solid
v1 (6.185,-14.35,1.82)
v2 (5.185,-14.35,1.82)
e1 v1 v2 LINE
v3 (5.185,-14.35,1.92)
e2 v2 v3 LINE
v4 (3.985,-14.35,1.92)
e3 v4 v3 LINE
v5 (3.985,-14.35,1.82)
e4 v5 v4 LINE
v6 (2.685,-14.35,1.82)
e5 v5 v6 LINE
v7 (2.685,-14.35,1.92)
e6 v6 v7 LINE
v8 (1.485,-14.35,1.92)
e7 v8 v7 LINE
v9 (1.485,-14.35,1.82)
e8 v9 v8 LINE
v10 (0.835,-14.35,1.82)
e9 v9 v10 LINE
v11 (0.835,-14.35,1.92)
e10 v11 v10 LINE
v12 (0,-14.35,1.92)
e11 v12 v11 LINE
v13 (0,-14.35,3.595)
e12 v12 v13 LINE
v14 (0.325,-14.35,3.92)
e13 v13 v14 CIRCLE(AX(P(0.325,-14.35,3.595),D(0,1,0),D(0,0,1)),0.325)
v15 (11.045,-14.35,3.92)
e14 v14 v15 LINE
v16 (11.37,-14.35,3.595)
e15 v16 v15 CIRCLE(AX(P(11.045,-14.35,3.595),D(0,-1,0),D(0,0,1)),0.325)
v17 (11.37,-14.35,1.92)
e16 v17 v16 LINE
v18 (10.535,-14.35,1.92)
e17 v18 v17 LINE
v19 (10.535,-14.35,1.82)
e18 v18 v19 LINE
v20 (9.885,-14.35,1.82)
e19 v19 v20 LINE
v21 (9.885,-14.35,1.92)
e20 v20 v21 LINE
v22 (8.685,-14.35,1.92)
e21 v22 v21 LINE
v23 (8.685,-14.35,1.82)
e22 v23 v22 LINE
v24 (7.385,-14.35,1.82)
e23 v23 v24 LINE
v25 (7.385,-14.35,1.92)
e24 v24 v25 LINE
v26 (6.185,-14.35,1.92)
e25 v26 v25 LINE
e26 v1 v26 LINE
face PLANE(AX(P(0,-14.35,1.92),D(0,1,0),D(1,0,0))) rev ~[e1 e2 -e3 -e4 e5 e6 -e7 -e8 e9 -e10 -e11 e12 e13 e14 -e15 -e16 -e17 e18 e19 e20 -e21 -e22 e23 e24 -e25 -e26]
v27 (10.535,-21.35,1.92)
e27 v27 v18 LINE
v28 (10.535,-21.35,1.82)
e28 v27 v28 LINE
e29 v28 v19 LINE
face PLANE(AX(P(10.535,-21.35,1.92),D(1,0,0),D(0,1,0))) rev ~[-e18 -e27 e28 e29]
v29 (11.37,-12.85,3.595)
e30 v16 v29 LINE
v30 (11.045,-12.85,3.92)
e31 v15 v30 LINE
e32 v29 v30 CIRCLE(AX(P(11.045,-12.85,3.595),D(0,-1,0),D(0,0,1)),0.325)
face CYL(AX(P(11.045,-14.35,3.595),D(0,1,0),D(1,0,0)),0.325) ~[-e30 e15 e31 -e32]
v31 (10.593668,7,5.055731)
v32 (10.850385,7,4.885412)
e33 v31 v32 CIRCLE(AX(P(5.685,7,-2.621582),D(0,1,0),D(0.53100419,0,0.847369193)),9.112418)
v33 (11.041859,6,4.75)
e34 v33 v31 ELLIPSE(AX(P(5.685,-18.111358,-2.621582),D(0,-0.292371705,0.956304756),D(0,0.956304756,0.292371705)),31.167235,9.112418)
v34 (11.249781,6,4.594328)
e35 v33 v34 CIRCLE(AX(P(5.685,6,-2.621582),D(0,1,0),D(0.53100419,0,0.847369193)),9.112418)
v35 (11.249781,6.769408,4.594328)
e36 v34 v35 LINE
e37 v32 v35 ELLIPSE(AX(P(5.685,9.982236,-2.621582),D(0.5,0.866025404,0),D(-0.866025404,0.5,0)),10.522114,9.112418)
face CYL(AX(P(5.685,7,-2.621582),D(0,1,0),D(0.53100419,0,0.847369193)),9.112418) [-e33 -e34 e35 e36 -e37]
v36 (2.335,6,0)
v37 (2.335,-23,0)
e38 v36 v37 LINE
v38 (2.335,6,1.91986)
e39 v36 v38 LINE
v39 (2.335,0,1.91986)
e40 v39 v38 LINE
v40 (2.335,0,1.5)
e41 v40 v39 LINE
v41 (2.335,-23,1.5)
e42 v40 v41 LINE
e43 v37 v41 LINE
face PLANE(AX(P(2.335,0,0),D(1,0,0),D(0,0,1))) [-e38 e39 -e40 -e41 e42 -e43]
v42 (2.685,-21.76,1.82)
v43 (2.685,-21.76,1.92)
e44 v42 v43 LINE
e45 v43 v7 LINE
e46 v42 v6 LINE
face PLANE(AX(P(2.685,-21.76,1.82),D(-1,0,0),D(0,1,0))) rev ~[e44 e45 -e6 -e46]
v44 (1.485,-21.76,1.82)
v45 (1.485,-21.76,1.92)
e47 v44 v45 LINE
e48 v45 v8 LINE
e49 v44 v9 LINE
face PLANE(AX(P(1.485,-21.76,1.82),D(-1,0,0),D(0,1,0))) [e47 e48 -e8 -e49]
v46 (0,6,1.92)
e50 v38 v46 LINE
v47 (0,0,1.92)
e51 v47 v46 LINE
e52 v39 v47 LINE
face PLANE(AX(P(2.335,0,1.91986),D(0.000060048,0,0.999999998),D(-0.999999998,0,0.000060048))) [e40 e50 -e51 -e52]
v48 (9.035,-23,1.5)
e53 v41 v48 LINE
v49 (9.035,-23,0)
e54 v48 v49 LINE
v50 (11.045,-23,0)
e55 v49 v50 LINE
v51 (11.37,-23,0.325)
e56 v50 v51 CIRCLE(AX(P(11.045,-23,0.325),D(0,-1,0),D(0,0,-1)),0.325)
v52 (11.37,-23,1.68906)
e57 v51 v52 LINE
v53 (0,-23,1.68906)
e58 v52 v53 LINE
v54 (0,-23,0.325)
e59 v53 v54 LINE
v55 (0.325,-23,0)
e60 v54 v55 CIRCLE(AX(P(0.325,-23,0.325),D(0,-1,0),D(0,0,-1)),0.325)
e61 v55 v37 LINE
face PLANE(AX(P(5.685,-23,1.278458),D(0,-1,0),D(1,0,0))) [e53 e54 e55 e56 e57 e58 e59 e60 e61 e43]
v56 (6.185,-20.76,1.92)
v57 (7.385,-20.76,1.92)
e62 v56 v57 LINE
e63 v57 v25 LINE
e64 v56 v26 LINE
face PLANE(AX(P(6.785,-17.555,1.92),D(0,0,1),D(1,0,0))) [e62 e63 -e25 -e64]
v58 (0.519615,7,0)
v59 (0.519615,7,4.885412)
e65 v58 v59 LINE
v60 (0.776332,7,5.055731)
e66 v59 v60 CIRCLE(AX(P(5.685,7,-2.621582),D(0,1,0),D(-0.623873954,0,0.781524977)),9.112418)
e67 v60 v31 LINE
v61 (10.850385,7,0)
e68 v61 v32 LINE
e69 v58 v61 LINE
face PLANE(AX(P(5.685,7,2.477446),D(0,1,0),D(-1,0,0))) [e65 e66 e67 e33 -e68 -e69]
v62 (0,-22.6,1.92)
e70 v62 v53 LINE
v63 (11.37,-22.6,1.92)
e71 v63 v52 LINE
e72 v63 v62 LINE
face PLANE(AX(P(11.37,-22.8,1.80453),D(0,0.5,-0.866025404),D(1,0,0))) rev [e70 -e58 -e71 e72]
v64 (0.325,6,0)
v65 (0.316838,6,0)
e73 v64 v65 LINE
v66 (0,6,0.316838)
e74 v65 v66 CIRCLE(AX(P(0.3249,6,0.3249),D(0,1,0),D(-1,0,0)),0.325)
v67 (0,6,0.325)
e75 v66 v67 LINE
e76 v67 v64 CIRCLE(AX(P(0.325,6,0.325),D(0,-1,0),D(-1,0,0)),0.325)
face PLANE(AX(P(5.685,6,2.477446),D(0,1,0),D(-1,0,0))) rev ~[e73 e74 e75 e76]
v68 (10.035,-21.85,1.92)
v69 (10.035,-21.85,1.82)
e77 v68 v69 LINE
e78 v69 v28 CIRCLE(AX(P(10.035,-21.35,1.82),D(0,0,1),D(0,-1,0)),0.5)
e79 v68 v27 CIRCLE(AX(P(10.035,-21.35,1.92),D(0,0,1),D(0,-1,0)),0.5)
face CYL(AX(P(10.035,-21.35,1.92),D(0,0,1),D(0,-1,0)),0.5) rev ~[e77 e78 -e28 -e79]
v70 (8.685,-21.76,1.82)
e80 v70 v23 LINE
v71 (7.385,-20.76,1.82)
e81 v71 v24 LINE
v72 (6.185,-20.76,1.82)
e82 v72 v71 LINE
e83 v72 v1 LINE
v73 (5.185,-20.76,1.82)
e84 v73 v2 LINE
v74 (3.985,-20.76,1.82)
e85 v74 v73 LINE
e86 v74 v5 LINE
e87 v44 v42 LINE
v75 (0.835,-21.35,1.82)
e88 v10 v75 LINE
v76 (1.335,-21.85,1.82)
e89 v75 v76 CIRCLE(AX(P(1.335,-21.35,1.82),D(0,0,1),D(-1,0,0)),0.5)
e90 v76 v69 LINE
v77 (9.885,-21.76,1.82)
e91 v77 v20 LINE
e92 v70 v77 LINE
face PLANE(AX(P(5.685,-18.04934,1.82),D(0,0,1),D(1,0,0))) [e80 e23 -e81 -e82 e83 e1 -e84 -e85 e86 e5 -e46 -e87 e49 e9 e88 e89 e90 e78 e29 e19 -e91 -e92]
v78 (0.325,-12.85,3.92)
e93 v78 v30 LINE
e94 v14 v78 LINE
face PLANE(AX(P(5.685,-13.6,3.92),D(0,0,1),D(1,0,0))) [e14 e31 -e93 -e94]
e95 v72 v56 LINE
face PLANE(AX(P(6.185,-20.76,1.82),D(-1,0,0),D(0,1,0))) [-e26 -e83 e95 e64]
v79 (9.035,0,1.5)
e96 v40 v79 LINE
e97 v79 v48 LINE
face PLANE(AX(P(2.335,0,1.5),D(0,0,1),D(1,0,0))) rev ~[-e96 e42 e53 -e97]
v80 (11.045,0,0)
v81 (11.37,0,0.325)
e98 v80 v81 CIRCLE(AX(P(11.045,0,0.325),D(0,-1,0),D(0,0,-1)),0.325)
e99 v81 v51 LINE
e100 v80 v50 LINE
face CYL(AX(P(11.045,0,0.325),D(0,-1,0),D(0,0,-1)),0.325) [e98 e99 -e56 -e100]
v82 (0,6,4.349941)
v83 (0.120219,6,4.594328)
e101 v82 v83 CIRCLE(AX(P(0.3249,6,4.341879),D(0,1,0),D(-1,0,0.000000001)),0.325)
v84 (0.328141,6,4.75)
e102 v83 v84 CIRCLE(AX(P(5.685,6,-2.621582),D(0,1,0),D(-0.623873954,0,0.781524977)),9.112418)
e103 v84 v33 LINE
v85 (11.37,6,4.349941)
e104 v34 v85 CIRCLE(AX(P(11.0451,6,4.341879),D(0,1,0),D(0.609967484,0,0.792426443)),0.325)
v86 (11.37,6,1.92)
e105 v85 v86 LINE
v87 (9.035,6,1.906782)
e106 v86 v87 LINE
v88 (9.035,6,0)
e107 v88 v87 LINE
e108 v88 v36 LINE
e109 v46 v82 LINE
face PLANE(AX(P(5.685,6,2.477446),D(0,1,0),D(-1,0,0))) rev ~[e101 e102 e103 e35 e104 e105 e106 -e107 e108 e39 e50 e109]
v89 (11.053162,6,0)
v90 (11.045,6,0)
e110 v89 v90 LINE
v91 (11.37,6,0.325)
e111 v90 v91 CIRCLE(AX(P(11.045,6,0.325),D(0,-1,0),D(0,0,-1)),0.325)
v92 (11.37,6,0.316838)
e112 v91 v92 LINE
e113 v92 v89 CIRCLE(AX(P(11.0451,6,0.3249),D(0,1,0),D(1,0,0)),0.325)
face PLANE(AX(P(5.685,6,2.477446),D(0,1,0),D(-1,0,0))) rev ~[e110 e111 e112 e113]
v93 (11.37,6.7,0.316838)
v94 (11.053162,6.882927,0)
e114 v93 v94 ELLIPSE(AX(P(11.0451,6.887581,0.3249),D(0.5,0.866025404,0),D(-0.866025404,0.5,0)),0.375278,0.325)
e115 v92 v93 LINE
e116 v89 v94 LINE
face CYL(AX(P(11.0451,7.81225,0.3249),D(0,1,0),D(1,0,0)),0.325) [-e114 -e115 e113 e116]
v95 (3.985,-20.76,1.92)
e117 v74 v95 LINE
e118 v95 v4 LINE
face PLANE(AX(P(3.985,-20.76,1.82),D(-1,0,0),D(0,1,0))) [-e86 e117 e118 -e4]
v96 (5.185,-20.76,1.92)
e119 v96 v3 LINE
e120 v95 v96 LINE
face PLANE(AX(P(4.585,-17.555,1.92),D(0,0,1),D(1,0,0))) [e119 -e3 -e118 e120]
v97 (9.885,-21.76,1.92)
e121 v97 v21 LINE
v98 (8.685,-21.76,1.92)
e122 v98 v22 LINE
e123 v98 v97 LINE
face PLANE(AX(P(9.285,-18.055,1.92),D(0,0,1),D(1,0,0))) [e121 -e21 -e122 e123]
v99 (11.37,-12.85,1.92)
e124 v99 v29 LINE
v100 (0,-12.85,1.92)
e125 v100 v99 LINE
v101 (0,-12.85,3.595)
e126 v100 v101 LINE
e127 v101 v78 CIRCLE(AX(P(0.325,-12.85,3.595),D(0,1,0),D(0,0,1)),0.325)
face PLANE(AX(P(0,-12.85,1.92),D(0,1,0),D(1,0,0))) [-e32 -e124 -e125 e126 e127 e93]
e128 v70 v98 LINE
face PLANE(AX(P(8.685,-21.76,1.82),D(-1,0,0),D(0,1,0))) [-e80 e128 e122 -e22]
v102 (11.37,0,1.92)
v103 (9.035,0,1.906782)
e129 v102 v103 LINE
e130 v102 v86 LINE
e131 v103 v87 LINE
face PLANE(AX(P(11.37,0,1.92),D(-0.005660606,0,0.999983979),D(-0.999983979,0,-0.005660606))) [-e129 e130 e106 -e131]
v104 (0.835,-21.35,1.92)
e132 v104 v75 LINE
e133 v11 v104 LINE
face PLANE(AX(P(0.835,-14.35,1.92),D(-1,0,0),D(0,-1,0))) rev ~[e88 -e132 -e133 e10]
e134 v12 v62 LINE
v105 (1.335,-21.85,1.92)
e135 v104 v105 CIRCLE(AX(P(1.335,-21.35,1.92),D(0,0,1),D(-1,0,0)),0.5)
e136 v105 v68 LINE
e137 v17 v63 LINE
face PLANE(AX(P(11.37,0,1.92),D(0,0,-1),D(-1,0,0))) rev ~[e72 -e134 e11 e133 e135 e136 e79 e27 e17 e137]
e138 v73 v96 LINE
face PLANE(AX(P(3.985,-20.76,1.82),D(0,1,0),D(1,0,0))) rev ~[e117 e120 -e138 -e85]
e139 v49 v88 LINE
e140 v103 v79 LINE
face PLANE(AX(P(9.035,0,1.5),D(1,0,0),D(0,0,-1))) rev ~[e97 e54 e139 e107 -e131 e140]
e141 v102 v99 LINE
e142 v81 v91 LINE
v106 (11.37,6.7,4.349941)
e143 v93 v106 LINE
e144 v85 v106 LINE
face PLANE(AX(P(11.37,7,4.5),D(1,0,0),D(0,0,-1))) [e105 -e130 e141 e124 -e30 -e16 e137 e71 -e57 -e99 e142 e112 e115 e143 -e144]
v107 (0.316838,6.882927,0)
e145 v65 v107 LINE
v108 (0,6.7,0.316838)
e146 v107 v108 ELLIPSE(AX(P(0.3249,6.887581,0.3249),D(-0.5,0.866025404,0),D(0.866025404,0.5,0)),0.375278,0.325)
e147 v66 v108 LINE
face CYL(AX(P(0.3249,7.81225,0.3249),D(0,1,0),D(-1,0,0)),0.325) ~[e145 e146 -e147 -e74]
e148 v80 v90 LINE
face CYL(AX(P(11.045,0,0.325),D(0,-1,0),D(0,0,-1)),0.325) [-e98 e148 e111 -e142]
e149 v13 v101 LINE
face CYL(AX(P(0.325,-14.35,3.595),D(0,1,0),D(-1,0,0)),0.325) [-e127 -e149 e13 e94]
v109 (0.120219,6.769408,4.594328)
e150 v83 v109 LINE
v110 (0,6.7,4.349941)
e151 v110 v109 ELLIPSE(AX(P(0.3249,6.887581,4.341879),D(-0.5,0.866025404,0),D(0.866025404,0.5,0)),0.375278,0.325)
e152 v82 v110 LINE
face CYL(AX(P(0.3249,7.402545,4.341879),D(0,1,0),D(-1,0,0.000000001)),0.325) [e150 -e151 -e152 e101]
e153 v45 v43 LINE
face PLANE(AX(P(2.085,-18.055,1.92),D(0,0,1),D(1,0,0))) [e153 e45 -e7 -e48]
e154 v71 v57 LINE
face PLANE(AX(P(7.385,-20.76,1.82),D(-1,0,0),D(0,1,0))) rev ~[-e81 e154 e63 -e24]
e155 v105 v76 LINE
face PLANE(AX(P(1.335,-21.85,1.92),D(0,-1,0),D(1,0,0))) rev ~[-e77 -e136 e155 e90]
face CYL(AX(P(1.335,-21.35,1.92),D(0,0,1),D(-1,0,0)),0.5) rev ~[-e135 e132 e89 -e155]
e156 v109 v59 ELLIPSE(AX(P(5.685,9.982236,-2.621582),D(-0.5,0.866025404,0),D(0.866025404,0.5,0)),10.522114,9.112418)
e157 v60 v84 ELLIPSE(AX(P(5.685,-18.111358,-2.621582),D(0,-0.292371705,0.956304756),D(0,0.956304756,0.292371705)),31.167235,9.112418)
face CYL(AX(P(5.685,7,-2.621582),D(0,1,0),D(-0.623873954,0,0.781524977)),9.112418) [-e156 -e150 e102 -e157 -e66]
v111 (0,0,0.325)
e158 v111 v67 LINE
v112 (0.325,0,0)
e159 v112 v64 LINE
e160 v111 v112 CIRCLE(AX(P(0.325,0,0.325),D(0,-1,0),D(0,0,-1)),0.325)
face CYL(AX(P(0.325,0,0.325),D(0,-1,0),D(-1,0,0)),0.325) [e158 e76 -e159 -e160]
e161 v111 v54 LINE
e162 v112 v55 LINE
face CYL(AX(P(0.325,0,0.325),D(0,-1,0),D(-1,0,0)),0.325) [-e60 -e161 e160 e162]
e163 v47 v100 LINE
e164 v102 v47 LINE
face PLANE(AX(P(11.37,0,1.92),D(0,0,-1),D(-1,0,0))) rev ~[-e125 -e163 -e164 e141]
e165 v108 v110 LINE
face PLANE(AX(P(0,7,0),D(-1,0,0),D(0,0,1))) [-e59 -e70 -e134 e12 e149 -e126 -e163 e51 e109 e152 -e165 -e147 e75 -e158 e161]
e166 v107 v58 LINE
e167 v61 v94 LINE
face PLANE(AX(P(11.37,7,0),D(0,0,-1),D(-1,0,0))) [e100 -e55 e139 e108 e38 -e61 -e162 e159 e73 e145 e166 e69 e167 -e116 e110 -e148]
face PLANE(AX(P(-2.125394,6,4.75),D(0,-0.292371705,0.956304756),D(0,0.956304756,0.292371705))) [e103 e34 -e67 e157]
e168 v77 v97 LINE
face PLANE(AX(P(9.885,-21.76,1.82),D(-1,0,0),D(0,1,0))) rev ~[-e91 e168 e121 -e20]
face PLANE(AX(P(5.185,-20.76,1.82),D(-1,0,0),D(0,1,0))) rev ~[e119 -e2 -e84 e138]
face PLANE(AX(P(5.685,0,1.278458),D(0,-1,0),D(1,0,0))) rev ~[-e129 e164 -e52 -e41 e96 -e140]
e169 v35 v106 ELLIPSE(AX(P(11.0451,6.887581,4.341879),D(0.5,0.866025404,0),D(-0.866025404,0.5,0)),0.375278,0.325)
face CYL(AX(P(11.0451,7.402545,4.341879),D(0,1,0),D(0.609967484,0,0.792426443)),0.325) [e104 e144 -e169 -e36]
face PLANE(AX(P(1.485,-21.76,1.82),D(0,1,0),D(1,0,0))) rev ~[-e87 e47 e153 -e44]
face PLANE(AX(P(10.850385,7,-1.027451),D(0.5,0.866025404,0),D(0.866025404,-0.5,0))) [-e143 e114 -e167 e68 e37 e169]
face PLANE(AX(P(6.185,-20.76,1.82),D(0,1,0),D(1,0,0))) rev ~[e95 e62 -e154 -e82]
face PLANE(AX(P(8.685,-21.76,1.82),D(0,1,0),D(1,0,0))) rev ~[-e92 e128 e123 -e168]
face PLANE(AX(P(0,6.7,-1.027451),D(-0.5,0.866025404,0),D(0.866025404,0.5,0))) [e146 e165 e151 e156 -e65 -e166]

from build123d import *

# Parameters (mm, degrees)
F1_DEPTH     = 23
F2_R         = 0.325
F3_SIZE2     = 0.2309401077
F3_SIZE      = 0.4
F5_DEPTH     = 7
F7_DEPTH     = 1
F8_T1_DEPTH  = 2.6245000769
F8_T3_DEPTH  = 1.8050905296
F9_W         = 11.37
F9_H         = 1.5
F10_DEPTH    = 2
F11_R        = 0.325
F12_T1_DEPTH = 6.7216810245
F14_DEPTH    = 0.1
F15_W        = 1.2
F15_H        = 6.41
F15_H_2      = 7.41
F16_DEPTH    = 0.1
F17_T1_DEPTH = 15.6207881718


# Not quite as in the source:
# - a fillet or chamfer that OpenCascade refuses, or shapes differently, is made with other operations: its cross-section is extruded or revolved along the edge and cut away or added


with BuildPart() as f1:
    # F0 (on Front) → F1 (new body)
    with BuildSketch(Plane.XZ):
        Polygon((0, 1.92), (0, 0), (2.335, 0), (2.335, 1.5), (9.035, 1.5), (9.035, 0), (11.37, 0), (11.37, 1.92), align=None)
    extrude(amount=F1_DEPTH)

    # F2
    f2_edges = [f1.edges().sort_by_distance(p)[0] for p in [
        (11.37, -11.5, 0),
        (0, -11.5, 0),
    ]]
    fillet(f2_edges, radius=F2_R)

    # F3
    f3_edges = [f1.edges().sort_by_distance(p)[0] for p in [
        (5.685, -23, 1.92),
    ]]
    f3_side = f1.faces().sort_by_distance((5.685, -11.5, 1.92))[0]
    chamfer(f3_edges, length=F3_SIZE, length2=F3_SIZE2, reference=f3_side)

    # F4 (on Front) → F5 (join)
    with BuildSketch(Plane.XZ):
        with BuildLine():
            ThreePointArc((0, 0.325), (0.0951902961, 0.0951902961), (0.325, 0))
            Line((0.325, 0), (2.335, 0))
            Line((2.335, 0), (2.335, 1.9198597874))
            Line((2.335, 1.9198597874), (0, 1.92))
            Line((0, 1.92), (0, 0.325))
        make_face()
        with BuildLine():
            Line((9.035, 1.9067822723), (9.035, 0))
            Line((9.035, 0), (11.045, 0))
            ThreePointArc((11.045, 0), (11.2748097039, 0.0951902961), (11.37, 0.325))
            Line((11.37, 0.325), (11.37, 1.92))
            Line((11.37, 1.92), (9.035, 1.9067822723))
        make_face()
    extrude(amount=-F5_DEPTH)

    # F6 (on face) → F7 (join)
    with BuildSketch(Plane(origin=(0, 7, 0), x_dir=(-1, 0, 0), z_dir=(0, 1, 0))):
        with BuildLine():
            Line((-11.37, 0), (0, 0))
            Line((0, 0), (0, 4.5))
            ThreePointArc((0, 4.5), (-0.4145888759, 4.8120524944), (-0.8462680731, 5.1))
            Line((-0.8462680731, 5.1), (-10.5237319269, 5.1))
            ThreePointArc((-10.5237319269, 5.1), (-10.9554111241, 4.8120524944), (-11.37, 4.5))
            Line((-11.37, 4.5), (-11.37, 0))
        make_face()
    extrude(amount=-F7_DEPTH)

    # F8: fillet of radius 0.325 on 4 edges, made by hand

    # F8_s2 → F8_t1 (cut)
    with BuildSketch(Plane.XZ.offset(-7.8122500385)):
        with BuildLine():
            ThreePointArc((-0.0001, 0.3249), (0.0950902961, 0.0950902961), (0.3249, -0.0001))
            Line((0.3249, -0.0001), (0.3249, -0.0066))
            ThreePointArc((0.3249, -0.0066), (0.16245, -0.0065), (0, -0.0065))
            Line((0, -0.0065), (-0.0065, 0))
            ThreePointArc((-0.0065, 0), (-0.0065, 0.16245), (-0.0066, 0.3249))
            Line((-0.0066, 0.3249), (-0.0001, 0.3249))
        make_face()
        with BuildLine():
            ThreePointArc((11.3701, 0.3249), (11.2749097039, 0.0950902961), (11.0451, -0.0001))
            Line((11.0451, -0.0001), (11.0451, -0.0066))
            ThreePointArc((11.0451, -0.0066), (11.20755, -0.0065), (11.37, -0.0065))
            Line((11.37, -0.0065), (11.3765, 0))
            ThreePointArc((11.3765, 0), (11.3765, 0.16245), (11.3766, 0.3249))
            Line((11.3766, 0.3249), (11.3701, 0.3249))
        make_face()
    extrude(amount=F8_T1_DEPTH, mode=Mode.SUBTRACT)

    # F8_s4 → F8_t3 (cut)
    with BuildSketch(Plane.XZ.offset(-7.4025452648)):
        with BuildLine():
            ThreePointArc((-0.0001, 4.3418793672), (0.0333071199, 4.4854014639), (0.1266605677, 4.5994179613))
            Line((0.1266605677, 4.5994179613), (0.122695779, 4.6045687332))
            ThreePointArc((0.122695779, 4.6045687332), (0.0591315692, 4.5550650769), (-0.0040551807, 4.5050799123))
            Line((-0.0040551807, 4.5050799123), (-0.0065, 4.5))
            ThreePointArc((-0.0065, 4.5), (-0.0065, 4.4209396836), (-0.0066, 4.3418793672))
            Line((-0.0066, 4.3418793672), (-0.0001, 4.3418793672))
        make_face()
        with BuildLine():
            ThreePointArc((11.2433394323, 4.5994179613), (11.3366928801, 4.4854014639), (11.3701, 4.3418793672))
            Line((11.3701, 4.3418793672), (11.3766, 4.3418793672))
            ThreePointArc((11.3766, 4.3418793672), (11.3765, 4.4209396836), (11.3765, 4.5))
            Line((11.3765, 4.5), (11.3740551807, 4.5050799123))
            ThreePointArc((11.3740551807, 4.5050799123), (11.3108684308, 4.5550650769), (11.247304221, 4.6045687332))
            Line((11.247304221, 4.6045687332), (11.2433394323, 4.5994179613))
        make_face()
    extrude(amount=F8_T3_DEPTH, mode=Mode.SUBTRACT)

    # F9 (on face) → F10 (join)
    with BuildSketch(Plane.XY.offset(1.92)):
        with Locations((5.685, -13.6)):
            Rectangle(F9_W, F9_H)
    extrude(amount=F10_DEPTH)

    # F11
    f11_edges = [f1.edges().sort_by_distance(p)[0] for p in [
        (0, -13.6, 3.92),
        (11.37, -13.6, 3.92),
    ]]
    fillet(f11_edges, radius=F11_R)

    # F12: chamfer of 0.3 x 0.5196152423 on 2 edges, made by hand

    # F12_s2 → F12_t1 (cut)
    with BuildSketch(Plane.XY.offset(-1.0274508288)):
        Polygon((10.8503847577, 7), (11.37, 6.7), (11.37, 7), align=None)
        Polygon((0, 6.7), (0.5196152423, 7), (0, 7), align=None)
    extrude(amount=F12_T1_DEPTH, mode=Mode.SUBTRACT)

    # F13 (on face) → F14 (cut)
    with BuildSketch(Plane.XY.offset(1.92)):
        with BuildLine():
            Line((10.535, -14.35), (0.835, -14.35))
            Line((0.835, -14.35), (0.835, -21.35))
            ThreePointArc((0.835, -21.35), (0.9814466094, -21.7035533906), (1.335, -21.85))
            Line((1.335, -21.85), (10.035, -21.85))
            ThreePointArc((10.035, -21.85), (10.3885533906, -21.7035533906), (10.535, -21.35))
            Line((10.535, -21.35), (10.535, -14.35))
        make_face()
    extrude(amount=-F14_DEPTH, mode=Mode.SUBTRACT)

    # F15 (on face) → F16 (join, through all)
    with BuildSketch(Plane.XY.offset(1.82)):
        with Locations((4.585, -17.555)):
            Rectangle(F15_W, F15_H)
        with Locations((2.085, -18.055)):
            Rectangle(F15_W, F15_H_2)
        with Locations((9.285, -18.055)):
            Rectangle(F15_W, F15_H_2)
        with Locations((6.785, -17.555)):
            Rectangle(F15_W, F15_H)
    extrude(amount=F16_DEPTH)

    # F17: chamfer of 0.35 x 1.1447984165 on 1 edges, made by hand

    # F17_s2 → F17_t1 (cut)
    with BuildSketch(Plane.YZ.offset(-2.1253940859)):
        Polygon((6, 4.75), (7.1447984165, 5.1), (6, 5.1), align=None)
    extrude(amount=F17_T1_DEPTH, mode=Mode.SUBTRACT)


solid = f1.part
